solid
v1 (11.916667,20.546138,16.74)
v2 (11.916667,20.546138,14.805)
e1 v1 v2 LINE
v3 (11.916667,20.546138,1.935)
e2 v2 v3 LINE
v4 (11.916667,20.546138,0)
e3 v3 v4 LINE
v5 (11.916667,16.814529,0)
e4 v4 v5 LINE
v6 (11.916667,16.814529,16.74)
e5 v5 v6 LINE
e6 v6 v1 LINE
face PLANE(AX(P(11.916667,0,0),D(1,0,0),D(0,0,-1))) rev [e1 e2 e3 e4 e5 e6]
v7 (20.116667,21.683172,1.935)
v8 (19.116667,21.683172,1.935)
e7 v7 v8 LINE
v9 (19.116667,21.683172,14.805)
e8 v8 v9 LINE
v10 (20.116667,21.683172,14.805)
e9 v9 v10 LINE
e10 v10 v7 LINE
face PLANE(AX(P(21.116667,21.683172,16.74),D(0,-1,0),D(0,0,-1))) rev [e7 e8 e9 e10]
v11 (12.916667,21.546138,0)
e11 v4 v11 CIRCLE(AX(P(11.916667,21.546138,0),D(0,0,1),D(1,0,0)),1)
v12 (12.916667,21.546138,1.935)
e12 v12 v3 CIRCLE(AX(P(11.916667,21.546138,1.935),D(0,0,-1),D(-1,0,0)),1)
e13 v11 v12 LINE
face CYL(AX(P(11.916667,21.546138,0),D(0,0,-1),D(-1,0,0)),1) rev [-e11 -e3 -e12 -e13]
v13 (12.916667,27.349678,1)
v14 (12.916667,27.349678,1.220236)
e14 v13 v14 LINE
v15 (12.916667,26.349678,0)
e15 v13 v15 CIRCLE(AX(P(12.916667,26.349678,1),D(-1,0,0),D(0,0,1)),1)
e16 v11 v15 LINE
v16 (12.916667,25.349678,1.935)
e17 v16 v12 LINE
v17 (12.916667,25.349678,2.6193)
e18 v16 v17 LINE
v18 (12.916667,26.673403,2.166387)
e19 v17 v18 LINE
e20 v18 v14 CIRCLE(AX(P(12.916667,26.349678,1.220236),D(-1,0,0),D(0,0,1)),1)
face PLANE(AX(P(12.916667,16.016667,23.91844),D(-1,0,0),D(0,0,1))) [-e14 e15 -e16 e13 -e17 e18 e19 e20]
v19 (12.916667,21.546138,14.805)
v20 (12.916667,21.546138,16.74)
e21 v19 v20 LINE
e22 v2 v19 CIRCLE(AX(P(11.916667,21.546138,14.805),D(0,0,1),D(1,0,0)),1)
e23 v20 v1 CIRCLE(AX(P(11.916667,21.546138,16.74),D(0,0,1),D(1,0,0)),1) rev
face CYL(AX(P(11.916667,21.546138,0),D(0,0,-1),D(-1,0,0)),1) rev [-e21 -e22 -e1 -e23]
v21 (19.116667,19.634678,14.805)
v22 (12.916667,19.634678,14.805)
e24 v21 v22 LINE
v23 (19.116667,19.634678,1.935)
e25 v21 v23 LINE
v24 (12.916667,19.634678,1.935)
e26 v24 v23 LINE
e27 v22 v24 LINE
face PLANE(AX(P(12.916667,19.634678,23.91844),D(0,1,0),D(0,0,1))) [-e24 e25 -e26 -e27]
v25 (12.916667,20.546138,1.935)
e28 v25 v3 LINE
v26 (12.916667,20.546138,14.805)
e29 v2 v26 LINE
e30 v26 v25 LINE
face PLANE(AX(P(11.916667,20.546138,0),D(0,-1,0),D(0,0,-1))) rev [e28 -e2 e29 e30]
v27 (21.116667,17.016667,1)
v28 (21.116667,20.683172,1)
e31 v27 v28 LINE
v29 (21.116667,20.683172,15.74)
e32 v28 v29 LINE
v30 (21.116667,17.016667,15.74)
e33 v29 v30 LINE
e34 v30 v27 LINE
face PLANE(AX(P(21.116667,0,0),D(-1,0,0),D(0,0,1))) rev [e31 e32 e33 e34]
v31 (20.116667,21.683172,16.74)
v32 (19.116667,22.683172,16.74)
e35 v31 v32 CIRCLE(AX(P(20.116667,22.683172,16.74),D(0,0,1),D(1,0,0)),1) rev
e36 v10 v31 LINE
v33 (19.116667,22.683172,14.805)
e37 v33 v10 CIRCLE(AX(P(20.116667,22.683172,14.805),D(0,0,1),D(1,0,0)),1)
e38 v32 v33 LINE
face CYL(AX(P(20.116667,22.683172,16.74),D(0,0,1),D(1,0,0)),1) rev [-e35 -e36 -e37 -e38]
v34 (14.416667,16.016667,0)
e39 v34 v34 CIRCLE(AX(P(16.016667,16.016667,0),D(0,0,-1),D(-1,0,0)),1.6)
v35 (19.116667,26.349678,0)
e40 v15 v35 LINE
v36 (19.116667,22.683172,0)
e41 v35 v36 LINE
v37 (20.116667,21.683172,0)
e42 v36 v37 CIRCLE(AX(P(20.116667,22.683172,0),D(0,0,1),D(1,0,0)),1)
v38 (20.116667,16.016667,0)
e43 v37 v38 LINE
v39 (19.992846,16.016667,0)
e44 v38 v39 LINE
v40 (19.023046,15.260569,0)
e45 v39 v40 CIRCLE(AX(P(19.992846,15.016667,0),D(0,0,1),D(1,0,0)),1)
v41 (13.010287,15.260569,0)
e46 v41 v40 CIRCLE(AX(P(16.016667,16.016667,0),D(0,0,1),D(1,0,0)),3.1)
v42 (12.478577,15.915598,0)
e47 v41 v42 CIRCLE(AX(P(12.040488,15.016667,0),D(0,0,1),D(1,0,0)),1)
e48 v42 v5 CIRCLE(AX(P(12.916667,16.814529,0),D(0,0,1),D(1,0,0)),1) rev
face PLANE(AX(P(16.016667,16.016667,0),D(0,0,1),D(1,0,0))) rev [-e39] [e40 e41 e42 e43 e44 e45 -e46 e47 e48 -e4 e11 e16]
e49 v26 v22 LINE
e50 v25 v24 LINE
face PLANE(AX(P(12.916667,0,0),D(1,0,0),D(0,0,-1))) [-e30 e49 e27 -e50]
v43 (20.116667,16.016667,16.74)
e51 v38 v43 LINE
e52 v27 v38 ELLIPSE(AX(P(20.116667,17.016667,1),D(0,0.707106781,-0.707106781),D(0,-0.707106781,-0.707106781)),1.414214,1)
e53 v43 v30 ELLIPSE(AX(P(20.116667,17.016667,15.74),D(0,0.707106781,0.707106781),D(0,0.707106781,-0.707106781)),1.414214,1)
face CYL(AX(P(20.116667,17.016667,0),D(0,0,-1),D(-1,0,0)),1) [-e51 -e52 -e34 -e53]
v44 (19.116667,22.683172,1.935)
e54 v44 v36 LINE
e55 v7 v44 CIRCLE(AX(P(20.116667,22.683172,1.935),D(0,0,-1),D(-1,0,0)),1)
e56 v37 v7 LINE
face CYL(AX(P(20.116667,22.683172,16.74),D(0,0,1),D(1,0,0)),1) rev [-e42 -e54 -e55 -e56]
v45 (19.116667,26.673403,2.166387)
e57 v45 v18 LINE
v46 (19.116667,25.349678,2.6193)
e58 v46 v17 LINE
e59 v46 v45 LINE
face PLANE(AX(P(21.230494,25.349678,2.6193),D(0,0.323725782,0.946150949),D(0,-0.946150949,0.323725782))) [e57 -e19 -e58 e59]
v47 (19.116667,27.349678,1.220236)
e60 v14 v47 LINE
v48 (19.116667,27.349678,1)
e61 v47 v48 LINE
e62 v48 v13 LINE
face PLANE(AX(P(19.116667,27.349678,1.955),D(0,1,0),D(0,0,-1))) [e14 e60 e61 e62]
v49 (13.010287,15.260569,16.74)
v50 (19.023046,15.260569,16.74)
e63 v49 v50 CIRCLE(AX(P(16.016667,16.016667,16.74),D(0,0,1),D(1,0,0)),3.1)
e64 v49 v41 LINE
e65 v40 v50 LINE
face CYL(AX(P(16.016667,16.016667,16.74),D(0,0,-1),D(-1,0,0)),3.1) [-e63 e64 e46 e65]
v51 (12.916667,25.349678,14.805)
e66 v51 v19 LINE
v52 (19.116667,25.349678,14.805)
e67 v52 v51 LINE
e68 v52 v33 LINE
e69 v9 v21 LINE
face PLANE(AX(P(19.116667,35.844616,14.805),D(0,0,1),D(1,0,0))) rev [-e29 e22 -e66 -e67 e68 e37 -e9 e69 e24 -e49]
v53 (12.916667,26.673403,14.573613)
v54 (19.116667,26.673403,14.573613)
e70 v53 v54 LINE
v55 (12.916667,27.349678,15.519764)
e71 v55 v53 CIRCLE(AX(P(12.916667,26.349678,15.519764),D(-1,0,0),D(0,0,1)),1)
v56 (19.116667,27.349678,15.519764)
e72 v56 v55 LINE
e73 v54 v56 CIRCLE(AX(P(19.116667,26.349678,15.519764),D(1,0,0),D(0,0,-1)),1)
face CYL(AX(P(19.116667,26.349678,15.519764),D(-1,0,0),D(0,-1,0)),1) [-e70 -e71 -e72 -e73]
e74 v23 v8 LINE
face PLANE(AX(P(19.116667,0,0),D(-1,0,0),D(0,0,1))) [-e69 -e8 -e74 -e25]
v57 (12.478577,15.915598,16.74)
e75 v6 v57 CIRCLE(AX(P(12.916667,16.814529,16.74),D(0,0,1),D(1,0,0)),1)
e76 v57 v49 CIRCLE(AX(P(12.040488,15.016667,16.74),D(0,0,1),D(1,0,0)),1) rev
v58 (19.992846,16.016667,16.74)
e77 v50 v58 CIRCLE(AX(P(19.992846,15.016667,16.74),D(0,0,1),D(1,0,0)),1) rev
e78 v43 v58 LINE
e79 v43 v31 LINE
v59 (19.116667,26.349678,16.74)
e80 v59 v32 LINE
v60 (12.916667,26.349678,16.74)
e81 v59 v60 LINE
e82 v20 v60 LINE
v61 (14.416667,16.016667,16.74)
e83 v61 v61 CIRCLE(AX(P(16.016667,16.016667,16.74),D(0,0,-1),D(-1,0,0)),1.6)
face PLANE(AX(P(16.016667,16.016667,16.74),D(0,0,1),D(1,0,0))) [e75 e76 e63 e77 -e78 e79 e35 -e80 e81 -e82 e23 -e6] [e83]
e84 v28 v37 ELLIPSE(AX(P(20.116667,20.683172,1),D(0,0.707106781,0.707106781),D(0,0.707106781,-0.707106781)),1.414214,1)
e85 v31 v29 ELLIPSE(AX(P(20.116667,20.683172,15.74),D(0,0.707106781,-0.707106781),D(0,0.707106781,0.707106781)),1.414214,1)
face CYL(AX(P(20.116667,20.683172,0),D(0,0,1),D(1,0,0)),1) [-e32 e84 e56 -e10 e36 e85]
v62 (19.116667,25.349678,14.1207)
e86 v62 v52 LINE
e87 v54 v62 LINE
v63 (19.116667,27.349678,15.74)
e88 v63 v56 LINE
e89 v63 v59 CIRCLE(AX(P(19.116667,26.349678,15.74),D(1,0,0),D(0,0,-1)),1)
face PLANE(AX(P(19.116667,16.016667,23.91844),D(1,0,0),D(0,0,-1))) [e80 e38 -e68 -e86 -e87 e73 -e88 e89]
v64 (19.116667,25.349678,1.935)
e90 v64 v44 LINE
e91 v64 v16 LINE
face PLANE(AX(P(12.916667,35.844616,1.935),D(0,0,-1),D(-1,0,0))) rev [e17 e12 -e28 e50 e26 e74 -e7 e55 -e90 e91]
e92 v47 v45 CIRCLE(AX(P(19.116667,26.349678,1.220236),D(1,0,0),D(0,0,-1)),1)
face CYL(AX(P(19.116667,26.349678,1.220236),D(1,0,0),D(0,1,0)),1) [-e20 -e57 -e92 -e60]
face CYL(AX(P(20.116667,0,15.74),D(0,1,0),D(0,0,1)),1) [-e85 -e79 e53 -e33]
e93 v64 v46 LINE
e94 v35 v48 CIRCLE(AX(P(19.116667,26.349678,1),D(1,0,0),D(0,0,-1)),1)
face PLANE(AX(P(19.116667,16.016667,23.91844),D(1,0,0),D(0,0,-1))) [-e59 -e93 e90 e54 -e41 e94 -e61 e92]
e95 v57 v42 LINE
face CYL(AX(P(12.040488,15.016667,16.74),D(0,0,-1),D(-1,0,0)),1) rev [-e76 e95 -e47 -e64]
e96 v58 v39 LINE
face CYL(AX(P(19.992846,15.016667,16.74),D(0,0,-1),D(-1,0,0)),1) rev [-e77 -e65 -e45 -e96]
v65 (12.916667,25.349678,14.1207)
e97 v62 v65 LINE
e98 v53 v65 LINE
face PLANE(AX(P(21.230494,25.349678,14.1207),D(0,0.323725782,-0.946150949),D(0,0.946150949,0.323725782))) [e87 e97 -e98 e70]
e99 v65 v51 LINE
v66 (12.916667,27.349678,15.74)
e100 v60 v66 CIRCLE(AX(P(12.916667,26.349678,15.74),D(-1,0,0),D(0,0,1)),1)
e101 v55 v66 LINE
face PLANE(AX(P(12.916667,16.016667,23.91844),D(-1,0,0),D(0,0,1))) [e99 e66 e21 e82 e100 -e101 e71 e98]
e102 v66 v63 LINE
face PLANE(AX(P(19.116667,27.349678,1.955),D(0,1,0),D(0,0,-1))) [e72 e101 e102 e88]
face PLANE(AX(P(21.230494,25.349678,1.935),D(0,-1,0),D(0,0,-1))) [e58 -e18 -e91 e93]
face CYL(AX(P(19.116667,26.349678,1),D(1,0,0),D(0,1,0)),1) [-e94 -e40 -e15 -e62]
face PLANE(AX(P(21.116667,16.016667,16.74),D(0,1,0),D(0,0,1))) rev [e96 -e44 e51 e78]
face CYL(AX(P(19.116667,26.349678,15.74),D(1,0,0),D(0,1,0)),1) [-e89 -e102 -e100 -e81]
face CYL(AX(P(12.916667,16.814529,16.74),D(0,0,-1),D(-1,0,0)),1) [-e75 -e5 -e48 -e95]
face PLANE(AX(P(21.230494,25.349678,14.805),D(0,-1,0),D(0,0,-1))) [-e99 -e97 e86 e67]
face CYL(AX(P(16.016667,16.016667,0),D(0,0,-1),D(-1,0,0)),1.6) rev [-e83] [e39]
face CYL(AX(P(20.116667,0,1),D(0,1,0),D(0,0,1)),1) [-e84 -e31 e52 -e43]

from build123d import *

# Parameters (mm, degrees)
ESBO_O1_R                = 3.1
ESBO_O1_R_2              = 1.55
RESSALTO_EXTRUS_O1_DEPTH = 16.74
BOSS_EXTRUDE1_DEPTH      = 16.74
SKETCH2_W                = 6.2
SKETCH2_H                = 1.935
BOSS_EXTRUDE2_DEPTH      = 7.715
BOSS_EXTRUDE3_DEPTH      = 6.2
SKETCH5_W                = 16.74
SKETCH5_H                = 5.66650546
BOSS_EXTRUDE4_DEPTH      = 2
SKETCH6_W                = 16.74
SKETCH6_H                = 4.529470895
BOSS_EXTRUDE5_DEPTH      = 1
FILLET1_R                = 1
FILLET4_R                = 1
M3_CLEARANCE_HOLE1_D     = 3.2


with BuildPart() as part:
    # Esboço1 → Ressalto-extrusão1 (new body)
    with BuildSketch(Plane.XY):
        with Locations((16.016666667, 16.016666667)):
            Circle(ESBO_O1_R)
        with Locations((16.016666667, 16.016666667)):
            Circle(ESBO_O1_R_2, mode=Mode.SUBTRACT)
    extrude(amount=RESSALTO_EXTRUS_O1_DEPTH)

    # Sketch1 → Boss-Extrude1 (add)
    with BuildSketch(Plane(origin=(0, 0, 0), x_dir=(-1, 0, 0), z_dir=(0, 0, -1))):
        with BuildLine():
            Line((-12.916666667, 16.016666667), (-12.916666667, 19.634677588))
            Line((-12.916666667, 19.634677588), (-19.116666667, 19.634677588))
            Line((-19.116666667, 19.634677588), (-19.116666667, 16.016666667))
            ThreePointArc((-19.116666667, 16.016666667), (-16.016666667, 19.116666667), (-12.916666667, 16.016666667))
        make_face()
    extrude(amount=-BOSS_EXTRUDE1_DEPTH)

    # Sketch2 → Boss-Extrude2 (add)
    with BuildSketch(Plane(origin=(0, 19.634677588, 0), x_dir=(1, 0, 0), z_dir=(0, 1, 0))):
        with Locations((16.016666667, -0.9675)):
            Rectangle(SKETCH2_W, SKETCH2_H)
        with Locations((16.016666667, -15.7725)):
            Rectangle(SKETCH2_W, SKETCH2_H)
    extrude(amount=BOSS_EXTRUDE2_DEPTH)

    # Sketch4 → Boss-Extrude3 (add)
    with BuildSketch(Plane.ZY.offset(-12.916666667)):
        Polygon((1.935, 27.349677588), (1.935, 25.349677588), (2.619300497, 25.349677588), align=None)
        Polygon((14.120699503, 25.349677588), (14.805, 27.349677588), (14.805, 25.349677588), align=None)
    extrude(amount=-BOSS_EXTRUDE3_DEPTH)

    # Sketch5 → Boss-Extrude4 (add)
    with BuildSketch(Plane(origin=(19.116666667, 0, 0), x_dir=(0, 0, -1), z_dir=(1, 0, 0))):
        with Locations((-8.37, 18.849919397)):
            Rectangle(SKETCH5_W, SKETCH5_H)
    extrude(amount=BOSS_EXTRUDE4_DEPTH)

    # Sketch6 → Boss-Extrude5 (add)
    with BuildSketch(Plane.ZY.offset(-12.916666667)):
        with Locations((8.37, 18.281402115)):
            Rectangle(SKETCH6_W, SKETCH6_H)
    extrude(amount=BOSS_EXTRUDE5_DEPTH)

    # Fillet1
    fillet1_edges = [part.edges().sort_by_distance(p)[0] for p in [
        (21.116666667, 21.683172127, 8.37),
        (21.116666667, 18.849919397, 0),
        (21.116666667, 16.016666667, 8.37),
        (21.116666667, 18.849919397, 16.74),
        (16.016666667, 27.349677588, 0),
        (16.016666667, 27.349677588, 1.935),
        (16.016666667, 27.349677588, 16.74),
        (16.016666667, 27.349677588, 14.805),
        (19.116666667, 21.683172127, 15.7725),
        (12.916666667, 20.546137562, 15.7725),
        (12.916666667, 20.546137562, 0.9675),
        (19.116666667, 21.683172127, 0.9675),
        (12.916666667, 16.016666667, 8.37),
        (19.116666667, 16.016666667, 8.37),
    ]]
    fillet(fillet1_edges, radius=FILLET1_R - 0.0001)  # a hair under: the kernel refuses the full size

    # Fillet4
    fillet4_edges = [part.edges().sort_by_distance(p)[0] for p in [
        (11.916666667, 16.016666667, 8.37),
    ]]
    fillet(fillet4_edges, radius=FILLET4_R)

    # M3 Clearance Hole1 (through all)
    with Locations(Plane(origin=(0, 0, 0), x_dir=(-1, 0, 0), z_dir=(0, 0, -1))):
        with Locations((-16.016666667, 16.016666667)):
            Hole(M3_CLEARANCE_HOLE1_D / 2)


solid = part.part
